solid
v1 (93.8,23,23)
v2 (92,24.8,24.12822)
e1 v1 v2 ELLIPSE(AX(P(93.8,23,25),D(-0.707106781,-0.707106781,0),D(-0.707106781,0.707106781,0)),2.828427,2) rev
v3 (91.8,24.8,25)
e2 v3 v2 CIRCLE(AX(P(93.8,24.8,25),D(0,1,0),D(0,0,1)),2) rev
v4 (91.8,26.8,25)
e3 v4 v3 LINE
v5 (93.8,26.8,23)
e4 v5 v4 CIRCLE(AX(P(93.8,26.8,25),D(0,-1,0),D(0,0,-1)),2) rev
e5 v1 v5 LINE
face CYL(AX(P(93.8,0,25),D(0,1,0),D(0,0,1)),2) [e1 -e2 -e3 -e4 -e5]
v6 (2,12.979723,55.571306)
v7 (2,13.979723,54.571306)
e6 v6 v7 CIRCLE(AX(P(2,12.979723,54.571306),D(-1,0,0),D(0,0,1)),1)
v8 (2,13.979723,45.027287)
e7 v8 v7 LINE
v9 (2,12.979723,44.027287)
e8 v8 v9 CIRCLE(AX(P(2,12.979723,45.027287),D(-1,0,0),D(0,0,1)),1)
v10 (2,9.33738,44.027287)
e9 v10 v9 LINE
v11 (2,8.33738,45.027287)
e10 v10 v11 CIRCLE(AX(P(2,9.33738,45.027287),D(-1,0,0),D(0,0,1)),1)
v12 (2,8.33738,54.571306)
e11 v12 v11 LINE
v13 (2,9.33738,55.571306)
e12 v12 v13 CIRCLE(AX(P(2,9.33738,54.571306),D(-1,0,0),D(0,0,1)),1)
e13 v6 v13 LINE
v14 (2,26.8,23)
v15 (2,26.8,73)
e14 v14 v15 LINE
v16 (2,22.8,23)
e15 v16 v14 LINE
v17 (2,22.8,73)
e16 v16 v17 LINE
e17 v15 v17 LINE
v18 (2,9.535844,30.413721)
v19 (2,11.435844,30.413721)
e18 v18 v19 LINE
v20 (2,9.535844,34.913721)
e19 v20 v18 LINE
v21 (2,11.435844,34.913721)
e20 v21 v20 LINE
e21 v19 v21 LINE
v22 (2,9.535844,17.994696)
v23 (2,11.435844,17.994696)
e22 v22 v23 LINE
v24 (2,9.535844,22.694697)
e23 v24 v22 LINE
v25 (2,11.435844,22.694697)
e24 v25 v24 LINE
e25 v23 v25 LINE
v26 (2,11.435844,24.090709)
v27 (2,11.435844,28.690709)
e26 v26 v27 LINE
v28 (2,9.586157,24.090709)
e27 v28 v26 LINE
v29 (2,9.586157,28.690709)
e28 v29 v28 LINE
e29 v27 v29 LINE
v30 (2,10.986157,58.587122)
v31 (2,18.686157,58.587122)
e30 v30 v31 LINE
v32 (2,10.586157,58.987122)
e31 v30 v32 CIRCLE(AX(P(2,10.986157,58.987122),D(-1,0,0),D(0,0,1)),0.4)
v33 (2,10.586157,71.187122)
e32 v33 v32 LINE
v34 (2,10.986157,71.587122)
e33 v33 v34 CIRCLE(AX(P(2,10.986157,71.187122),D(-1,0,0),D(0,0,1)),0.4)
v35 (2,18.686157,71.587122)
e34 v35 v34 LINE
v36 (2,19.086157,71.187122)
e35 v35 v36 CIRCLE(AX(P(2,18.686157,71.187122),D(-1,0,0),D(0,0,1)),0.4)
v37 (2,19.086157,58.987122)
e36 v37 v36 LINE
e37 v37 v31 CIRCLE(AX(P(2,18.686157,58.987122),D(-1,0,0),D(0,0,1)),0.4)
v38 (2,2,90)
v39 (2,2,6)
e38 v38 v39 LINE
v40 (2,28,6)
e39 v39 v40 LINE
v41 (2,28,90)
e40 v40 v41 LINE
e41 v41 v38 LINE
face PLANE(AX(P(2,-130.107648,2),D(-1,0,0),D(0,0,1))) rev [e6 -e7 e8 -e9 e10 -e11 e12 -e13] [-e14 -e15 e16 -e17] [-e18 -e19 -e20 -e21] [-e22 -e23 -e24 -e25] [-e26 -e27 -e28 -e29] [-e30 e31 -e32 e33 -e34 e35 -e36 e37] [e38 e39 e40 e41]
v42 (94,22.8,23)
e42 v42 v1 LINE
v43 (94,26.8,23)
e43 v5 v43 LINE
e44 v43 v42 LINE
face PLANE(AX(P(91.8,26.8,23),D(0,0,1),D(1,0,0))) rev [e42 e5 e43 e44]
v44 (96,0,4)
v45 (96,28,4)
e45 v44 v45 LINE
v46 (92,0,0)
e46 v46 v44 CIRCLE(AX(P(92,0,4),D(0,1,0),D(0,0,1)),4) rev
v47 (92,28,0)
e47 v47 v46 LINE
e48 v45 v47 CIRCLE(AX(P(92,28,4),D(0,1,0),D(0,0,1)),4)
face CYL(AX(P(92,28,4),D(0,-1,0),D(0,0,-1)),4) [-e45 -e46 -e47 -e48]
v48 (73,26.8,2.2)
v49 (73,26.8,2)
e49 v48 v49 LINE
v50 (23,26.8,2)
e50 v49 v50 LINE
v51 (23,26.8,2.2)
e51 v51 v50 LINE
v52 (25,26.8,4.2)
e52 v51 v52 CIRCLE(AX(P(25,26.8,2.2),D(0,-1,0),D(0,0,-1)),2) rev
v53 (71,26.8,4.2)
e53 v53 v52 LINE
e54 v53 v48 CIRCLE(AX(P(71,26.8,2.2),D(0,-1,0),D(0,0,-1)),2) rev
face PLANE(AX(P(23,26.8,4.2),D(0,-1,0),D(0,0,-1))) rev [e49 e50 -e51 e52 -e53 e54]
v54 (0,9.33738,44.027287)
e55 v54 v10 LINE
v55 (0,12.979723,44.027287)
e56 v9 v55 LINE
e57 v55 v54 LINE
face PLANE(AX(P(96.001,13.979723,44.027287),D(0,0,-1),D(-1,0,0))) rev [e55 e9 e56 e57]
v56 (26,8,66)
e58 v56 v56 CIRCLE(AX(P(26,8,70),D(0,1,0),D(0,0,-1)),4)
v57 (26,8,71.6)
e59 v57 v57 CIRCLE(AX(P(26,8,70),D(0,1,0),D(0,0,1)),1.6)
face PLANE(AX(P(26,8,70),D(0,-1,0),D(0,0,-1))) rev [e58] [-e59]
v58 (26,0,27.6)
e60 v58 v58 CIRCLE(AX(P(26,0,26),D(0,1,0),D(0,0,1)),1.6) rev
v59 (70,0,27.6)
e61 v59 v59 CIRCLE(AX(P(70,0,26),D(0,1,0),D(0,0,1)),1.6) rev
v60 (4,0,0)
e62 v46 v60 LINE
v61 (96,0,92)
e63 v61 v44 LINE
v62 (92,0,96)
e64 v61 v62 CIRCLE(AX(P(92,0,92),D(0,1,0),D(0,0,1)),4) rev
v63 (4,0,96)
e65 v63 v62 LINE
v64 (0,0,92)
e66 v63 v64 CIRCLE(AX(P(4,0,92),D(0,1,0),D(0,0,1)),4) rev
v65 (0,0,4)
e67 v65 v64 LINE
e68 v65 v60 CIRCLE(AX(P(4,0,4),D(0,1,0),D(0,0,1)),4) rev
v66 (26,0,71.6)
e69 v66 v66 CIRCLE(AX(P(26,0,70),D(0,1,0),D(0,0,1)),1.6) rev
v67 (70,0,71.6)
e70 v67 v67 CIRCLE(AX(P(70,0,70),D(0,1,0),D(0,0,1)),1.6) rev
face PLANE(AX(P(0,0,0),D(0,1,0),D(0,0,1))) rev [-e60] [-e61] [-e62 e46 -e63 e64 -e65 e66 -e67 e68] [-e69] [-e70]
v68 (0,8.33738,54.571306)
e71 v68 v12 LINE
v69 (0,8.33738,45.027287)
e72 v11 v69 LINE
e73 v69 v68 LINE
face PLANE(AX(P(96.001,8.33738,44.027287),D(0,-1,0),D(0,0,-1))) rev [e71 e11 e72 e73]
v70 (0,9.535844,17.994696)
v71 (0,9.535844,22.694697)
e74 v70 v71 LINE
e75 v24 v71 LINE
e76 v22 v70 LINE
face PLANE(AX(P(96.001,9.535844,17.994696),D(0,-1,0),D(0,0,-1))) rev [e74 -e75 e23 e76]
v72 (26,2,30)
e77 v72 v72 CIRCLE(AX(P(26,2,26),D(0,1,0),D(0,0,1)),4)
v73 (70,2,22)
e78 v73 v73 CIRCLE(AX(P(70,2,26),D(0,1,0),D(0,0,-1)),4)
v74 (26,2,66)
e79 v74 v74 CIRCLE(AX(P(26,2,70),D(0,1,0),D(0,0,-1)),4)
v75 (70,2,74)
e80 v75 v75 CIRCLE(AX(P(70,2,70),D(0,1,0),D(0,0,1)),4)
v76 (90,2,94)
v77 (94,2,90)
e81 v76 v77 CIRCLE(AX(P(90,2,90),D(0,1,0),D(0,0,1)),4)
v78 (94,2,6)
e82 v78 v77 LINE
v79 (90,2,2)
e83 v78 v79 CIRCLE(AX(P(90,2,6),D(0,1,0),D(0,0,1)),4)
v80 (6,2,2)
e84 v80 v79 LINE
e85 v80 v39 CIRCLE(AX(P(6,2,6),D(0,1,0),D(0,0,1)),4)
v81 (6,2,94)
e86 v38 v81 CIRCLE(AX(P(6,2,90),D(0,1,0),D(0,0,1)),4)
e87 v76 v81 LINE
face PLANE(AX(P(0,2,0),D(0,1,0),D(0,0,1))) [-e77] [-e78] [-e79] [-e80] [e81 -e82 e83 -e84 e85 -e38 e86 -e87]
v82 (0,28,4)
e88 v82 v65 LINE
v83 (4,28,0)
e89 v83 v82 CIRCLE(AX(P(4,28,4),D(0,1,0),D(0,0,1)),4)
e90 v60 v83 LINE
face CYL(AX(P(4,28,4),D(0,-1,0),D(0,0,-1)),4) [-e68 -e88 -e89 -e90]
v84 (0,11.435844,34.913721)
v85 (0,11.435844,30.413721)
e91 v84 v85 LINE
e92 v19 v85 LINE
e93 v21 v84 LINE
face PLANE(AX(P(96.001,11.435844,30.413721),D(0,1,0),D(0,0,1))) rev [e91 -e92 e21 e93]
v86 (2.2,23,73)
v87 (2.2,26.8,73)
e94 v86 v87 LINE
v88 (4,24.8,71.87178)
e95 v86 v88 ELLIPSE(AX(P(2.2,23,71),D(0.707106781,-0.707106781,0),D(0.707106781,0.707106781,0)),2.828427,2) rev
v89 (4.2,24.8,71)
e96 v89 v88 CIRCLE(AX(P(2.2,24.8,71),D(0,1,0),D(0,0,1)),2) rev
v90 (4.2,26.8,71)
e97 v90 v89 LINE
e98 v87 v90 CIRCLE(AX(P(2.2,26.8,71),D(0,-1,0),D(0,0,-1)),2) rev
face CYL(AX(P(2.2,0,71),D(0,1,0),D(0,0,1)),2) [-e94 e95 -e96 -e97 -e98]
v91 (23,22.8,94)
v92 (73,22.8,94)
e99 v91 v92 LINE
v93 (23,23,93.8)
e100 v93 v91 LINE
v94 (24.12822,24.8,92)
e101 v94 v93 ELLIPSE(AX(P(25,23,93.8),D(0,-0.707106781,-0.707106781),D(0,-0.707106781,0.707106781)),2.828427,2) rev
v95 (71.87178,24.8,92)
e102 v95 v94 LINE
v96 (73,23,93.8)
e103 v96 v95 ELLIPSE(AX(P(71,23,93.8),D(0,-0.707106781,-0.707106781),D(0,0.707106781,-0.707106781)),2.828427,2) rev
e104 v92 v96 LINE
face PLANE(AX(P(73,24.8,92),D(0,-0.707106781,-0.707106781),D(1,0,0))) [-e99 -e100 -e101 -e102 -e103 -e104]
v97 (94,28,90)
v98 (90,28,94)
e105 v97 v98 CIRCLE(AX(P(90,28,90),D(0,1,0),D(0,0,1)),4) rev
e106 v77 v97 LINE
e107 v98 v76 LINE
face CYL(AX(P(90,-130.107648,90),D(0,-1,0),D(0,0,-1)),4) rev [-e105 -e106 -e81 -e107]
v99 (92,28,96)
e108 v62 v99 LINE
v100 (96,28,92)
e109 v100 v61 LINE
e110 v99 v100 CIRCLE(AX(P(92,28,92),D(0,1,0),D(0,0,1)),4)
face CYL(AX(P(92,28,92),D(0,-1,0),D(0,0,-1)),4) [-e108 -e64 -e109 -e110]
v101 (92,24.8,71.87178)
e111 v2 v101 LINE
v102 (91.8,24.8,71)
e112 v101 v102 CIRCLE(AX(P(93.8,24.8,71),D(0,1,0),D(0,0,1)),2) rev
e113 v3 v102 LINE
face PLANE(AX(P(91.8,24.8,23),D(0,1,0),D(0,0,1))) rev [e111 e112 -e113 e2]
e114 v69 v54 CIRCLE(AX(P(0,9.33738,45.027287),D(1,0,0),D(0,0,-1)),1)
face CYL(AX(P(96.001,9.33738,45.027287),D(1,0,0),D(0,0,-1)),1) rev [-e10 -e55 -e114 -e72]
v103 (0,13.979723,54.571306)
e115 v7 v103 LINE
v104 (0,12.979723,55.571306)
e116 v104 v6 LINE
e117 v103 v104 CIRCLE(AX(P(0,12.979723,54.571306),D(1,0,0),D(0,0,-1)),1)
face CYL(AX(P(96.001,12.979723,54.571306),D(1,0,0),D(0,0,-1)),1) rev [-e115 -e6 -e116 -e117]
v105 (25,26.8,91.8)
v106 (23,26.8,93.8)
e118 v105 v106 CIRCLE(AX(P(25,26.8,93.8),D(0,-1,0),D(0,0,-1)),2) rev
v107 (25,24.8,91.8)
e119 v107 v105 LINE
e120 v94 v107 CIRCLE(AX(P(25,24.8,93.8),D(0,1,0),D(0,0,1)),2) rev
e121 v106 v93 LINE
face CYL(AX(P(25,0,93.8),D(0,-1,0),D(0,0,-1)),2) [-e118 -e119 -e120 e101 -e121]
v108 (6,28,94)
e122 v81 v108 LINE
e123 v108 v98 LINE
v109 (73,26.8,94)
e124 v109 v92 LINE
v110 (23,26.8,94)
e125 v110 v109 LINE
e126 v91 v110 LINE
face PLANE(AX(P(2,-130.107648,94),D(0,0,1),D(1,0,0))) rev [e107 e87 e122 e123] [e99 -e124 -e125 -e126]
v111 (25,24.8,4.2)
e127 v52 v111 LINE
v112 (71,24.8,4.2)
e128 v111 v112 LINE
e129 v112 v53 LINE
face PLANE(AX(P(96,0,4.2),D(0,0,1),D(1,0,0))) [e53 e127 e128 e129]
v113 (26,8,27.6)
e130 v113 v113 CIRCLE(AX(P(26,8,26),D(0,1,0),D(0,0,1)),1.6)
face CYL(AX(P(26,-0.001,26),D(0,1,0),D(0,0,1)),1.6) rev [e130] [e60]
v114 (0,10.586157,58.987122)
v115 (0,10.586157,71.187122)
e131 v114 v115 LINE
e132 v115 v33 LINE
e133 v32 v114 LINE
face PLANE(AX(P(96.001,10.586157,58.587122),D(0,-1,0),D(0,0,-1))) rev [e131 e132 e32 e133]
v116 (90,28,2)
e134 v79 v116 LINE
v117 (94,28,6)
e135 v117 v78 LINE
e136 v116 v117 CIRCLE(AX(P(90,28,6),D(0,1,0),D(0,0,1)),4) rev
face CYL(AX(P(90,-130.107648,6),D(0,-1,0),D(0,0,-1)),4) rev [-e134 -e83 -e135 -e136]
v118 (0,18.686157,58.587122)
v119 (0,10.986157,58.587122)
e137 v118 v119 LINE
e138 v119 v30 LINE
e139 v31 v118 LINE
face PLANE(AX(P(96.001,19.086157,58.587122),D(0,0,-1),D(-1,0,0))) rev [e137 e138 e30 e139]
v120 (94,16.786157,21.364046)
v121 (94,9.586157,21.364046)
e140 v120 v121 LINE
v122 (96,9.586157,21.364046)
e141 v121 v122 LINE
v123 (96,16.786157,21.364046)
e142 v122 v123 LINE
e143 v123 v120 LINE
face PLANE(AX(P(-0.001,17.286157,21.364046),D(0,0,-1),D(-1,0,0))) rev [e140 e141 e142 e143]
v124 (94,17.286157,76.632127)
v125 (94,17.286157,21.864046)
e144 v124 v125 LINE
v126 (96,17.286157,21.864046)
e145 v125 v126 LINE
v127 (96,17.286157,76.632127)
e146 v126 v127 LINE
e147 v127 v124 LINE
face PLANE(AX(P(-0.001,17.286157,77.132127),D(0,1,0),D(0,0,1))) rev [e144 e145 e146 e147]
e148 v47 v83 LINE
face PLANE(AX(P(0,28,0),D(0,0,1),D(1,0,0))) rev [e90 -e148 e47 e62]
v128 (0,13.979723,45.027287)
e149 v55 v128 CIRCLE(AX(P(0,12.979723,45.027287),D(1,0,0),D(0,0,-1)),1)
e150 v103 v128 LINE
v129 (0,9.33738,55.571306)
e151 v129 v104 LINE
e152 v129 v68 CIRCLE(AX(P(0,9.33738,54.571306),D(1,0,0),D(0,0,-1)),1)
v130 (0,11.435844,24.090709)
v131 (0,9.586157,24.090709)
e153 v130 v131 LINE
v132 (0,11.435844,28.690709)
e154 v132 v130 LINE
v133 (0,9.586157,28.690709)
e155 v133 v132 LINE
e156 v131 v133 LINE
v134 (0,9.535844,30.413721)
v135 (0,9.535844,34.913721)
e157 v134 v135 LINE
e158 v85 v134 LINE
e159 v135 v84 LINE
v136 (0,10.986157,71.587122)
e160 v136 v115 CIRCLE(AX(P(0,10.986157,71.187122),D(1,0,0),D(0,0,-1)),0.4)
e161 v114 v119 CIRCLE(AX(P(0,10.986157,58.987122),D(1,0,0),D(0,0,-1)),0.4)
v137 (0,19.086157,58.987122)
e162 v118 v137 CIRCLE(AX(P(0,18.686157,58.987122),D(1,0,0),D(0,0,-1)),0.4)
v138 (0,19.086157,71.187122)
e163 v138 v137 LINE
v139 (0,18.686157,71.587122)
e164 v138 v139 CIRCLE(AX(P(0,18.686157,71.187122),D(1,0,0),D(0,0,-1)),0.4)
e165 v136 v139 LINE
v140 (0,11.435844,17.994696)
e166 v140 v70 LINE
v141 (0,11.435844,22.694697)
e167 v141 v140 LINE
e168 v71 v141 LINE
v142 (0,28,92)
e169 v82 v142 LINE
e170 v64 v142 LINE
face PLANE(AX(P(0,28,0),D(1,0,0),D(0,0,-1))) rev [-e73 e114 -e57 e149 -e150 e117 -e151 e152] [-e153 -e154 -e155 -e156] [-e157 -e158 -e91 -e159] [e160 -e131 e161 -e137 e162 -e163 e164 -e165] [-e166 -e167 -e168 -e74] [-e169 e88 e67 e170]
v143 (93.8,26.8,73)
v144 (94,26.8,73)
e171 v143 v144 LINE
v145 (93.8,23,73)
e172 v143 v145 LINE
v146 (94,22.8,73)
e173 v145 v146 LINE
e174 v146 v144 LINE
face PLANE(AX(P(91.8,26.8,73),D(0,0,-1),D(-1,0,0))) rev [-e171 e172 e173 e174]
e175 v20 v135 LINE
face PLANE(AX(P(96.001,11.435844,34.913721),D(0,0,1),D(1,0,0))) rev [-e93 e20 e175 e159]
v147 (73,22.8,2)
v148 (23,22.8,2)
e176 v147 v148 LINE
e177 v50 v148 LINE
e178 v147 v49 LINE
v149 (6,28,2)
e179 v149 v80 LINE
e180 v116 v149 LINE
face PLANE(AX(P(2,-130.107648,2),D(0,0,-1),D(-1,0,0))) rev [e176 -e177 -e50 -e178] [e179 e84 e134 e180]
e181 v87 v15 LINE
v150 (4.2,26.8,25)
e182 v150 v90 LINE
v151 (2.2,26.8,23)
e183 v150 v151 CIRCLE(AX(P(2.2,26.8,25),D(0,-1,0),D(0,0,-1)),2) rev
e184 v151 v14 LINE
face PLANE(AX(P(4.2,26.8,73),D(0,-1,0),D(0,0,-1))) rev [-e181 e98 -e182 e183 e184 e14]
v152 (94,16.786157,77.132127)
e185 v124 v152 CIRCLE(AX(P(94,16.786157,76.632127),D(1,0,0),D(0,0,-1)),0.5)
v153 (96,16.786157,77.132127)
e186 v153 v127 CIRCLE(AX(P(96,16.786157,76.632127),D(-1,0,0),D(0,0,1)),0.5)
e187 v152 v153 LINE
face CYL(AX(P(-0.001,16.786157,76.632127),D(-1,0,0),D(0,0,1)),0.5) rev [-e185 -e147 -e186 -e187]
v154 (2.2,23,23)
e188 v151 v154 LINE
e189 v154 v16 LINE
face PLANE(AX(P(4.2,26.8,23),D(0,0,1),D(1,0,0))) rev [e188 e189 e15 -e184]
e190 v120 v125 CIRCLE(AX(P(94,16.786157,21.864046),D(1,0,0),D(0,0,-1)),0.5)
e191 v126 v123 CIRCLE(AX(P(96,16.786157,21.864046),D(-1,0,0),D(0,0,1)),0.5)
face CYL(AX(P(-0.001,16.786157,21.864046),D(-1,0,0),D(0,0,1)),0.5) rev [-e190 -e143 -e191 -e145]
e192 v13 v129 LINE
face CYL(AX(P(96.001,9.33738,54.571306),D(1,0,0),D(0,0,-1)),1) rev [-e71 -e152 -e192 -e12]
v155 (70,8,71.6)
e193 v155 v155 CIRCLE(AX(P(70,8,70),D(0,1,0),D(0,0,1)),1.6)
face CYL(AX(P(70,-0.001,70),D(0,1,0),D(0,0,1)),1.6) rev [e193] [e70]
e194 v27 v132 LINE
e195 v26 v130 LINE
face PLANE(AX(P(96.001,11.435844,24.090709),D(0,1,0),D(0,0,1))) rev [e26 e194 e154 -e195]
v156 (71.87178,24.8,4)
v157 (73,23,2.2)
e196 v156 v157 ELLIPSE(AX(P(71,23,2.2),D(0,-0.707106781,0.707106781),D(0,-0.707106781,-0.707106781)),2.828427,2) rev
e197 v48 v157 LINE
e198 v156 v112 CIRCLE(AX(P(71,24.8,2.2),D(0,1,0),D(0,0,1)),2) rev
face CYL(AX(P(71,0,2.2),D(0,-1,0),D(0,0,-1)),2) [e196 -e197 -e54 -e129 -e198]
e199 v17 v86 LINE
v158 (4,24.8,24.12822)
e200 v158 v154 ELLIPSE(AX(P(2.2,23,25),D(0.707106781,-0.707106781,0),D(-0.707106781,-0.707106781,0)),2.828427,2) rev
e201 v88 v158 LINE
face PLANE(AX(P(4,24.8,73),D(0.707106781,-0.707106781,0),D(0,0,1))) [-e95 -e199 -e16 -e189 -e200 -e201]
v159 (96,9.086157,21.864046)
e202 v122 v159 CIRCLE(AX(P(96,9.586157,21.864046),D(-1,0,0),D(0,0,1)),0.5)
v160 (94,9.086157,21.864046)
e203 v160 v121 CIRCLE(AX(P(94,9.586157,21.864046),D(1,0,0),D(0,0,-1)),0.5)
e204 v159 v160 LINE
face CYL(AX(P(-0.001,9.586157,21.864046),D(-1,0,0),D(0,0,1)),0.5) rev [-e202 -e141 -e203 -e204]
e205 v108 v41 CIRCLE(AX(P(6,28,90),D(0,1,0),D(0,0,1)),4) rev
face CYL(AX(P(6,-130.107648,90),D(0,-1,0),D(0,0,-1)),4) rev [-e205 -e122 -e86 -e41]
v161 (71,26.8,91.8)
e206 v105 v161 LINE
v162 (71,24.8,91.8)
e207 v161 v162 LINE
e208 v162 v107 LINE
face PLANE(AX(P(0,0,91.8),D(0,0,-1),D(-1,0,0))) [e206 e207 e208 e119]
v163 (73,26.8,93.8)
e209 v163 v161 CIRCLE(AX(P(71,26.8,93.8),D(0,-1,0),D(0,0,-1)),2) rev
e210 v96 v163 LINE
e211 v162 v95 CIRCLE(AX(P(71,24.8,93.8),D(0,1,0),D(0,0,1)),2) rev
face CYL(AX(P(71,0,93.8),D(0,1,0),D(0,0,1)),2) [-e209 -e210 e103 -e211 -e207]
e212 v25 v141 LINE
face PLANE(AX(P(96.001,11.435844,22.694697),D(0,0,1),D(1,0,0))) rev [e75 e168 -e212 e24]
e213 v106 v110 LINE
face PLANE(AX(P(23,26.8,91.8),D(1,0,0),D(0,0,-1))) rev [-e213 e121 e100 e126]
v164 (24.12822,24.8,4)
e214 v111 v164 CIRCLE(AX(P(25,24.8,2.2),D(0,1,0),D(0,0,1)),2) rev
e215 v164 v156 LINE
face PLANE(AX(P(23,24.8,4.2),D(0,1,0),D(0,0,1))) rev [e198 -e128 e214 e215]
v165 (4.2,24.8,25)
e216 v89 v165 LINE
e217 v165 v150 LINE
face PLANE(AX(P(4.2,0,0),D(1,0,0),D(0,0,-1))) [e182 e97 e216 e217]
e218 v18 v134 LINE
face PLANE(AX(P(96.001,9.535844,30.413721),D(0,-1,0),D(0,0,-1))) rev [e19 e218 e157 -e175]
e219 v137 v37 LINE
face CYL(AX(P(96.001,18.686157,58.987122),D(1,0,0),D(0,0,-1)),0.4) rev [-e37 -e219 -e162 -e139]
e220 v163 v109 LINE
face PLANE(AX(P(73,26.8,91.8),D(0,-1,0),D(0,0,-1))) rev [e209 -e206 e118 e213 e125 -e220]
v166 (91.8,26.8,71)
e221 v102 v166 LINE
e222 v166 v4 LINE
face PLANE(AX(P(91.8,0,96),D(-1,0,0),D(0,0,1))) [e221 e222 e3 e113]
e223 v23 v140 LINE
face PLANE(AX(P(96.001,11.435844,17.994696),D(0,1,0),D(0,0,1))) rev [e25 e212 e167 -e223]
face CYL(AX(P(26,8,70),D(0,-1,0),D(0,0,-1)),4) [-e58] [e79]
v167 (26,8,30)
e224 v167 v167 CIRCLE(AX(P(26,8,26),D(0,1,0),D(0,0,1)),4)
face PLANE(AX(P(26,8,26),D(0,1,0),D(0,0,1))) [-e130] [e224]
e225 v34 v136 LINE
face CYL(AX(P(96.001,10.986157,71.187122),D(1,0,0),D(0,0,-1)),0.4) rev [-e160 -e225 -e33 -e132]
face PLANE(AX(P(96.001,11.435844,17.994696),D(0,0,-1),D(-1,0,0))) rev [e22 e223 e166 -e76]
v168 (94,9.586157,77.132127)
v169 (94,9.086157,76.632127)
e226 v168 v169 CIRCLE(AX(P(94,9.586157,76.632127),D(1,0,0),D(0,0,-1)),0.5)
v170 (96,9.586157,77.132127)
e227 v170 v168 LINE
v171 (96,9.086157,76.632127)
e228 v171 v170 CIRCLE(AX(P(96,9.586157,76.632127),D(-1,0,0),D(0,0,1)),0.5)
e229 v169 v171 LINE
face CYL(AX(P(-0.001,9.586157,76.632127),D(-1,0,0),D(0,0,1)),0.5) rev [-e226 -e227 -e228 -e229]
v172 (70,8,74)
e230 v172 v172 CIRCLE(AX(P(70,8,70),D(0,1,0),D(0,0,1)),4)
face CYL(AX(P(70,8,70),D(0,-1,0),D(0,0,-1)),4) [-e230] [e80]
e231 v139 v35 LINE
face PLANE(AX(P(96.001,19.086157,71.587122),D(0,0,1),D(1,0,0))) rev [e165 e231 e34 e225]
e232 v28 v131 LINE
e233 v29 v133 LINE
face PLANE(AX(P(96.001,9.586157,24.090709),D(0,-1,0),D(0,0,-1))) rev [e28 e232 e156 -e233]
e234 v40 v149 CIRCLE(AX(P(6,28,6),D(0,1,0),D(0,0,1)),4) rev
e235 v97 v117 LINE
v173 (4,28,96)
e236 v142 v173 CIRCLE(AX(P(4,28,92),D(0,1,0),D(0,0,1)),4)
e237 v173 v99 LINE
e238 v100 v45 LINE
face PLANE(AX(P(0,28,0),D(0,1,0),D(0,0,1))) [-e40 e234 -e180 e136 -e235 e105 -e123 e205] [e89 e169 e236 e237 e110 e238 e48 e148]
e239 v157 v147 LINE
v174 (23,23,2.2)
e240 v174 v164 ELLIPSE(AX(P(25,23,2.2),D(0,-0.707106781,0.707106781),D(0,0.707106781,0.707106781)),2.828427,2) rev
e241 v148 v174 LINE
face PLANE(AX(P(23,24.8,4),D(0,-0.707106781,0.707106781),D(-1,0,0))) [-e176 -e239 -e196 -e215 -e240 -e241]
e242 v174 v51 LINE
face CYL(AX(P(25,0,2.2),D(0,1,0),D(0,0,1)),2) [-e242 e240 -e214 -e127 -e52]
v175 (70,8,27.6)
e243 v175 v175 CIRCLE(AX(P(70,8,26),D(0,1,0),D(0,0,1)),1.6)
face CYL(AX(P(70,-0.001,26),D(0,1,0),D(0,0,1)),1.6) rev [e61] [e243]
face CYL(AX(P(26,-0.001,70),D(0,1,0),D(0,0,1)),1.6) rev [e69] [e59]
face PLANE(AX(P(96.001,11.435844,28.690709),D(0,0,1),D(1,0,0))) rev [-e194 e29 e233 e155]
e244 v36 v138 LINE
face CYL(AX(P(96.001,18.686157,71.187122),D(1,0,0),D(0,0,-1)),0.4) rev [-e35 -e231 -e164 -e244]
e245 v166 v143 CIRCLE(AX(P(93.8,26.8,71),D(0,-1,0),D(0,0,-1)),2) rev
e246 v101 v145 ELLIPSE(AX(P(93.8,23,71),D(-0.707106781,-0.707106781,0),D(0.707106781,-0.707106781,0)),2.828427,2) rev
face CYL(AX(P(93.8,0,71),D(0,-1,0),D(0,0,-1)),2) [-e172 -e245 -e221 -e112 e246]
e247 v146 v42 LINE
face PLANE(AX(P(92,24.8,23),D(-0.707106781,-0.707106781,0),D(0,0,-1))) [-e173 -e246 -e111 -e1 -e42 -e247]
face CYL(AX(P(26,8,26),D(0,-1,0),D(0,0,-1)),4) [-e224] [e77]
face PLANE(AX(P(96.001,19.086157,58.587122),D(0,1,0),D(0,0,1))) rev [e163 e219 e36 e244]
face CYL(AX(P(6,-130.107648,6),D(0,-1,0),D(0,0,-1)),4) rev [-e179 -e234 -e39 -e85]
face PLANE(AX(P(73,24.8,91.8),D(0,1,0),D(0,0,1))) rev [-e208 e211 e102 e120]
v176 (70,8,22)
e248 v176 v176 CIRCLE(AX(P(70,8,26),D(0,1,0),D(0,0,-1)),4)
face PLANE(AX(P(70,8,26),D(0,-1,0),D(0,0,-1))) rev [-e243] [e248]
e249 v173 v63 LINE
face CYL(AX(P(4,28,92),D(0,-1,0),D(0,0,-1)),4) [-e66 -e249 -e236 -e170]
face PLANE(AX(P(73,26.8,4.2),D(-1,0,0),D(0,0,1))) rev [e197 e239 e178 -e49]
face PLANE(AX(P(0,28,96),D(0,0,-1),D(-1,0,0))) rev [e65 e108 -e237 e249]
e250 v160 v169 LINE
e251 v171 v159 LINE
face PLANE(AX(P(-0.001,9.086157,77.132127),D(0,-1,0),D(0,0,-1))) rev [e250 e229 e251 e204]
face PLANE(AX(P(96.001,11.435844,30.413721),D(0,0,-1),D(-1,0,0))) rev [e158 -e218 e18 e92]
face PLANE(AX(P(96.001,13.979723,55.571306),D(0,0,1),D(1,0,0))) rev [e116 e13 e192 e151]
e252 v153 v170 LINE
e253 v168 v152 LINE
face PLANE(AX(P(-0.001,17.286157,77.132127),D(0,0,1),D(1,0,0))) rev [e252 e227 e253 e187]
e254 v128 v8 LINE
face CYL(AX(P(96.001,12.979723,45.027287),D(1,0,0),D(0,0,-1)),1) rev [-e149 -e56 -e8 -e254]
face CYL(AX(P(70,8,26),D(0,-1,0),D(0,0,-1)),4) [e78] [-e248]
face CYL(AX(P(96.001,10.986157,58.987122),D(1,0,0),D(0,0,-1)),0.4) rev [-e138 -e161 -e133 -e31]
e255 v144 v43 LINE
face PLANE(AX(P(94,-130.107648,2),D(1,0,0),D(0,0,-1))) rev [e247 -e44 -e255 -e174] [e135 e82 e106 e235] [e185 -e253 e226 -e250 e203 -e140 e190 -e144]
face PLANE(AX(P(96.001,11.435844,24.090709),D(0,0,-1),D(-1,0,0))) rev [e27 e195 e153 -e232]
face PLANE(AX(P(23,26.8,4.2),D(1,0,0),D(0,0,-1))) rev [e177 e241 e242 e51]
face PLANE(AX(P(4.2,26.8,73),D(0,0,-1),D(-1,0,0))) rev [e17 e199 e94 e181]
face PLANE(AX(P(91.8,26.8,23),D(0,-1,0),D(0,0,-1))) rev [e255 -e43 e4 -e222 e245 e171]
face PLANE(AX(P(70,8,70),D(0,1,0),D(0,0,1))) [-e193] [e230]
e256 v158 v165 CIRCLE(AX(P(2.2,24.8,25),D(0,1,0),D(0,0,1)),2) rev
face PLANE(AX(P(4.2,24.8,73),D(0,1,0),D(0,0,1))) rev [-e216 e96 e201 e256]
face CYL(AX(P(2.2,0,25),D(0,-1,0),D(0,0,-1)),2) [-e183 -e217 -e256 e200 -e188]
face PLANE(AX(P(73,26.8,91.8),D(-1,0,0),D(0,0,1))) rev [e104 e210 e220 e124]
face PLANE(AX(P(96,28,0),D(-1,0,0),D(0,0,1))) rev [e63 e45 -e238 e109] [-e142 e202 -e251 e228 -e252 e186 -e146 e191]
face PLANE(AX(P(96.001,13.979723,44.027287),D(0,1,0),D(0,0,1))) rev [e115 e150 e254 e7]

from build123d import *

# Parameters (mm, degrees)
SKETCH_1_W               = 96
SKETCH_1_H               = 96
EXTRUDE_1_DEPTH          = 28
SKETCH_3_W               = 92
SKETCH_3_H               = 92
CUT_EXTRUDE_1_DEPTH      = 26
FILLET_1_R               = 4
FILLET_2_R               = 4
SKETCH_4_R               = 4
EXTRUDE_2_DEPTH          = 6
SKETCH_5_R               = 1.6
CUT_EXTRUDE_2_DEPTH      = 8
SKETCH_6_W               = 12.999999928
SKETCH_6_H               = 8.49999995
SKETCH_6_W_2             = 4.700000191
SKETCH_6_H_2             = 1.900000077
SKETCH_6_W_3             = 4.600000187
SKETCH_6_H_3             = 1.849687021
SKETCH_6_W_4             = 4.500000183
SKETCH_6_W_5             = 11.544018717
SKETCH_6_H_4             = 5.642342208
CUT_EXTRUDE_3_DEPTH      = 2
FILLET_3_R               = 0.4
SKETCH_7_W               = 55.768080965
SKETCH_7_H               = 8.199999866
CUT_EXTRUDE_4_DEPTH      = 2
FILLET_4_R               = 0.5
FILLET_5_R               = 1
SKETCH_8_W               = 50
SKETCH_8_H               = 2
EXTRUDE_3_DEPTH          = 2.2
FILLET_6_R               = 2
PATTERN_CIRCULAR_1_COUNT = 4
FILLET_7_R               = 2
CHAMFER_START            = 23
CHAMFER_1_DEPTH          = 50
CHAMFER_START_2          = 22.8
CHAMFER_1_2_DEPTH        = 2
CHAMFER_2_DEPTH          = 50
CHAMFER_2_2_DEPTH        = 2
CHAMFER_3_DEPTH          = 50
CHAMFER_3_2_DEPTH        = 2
CHAMFER_4_DEPTH          = 50
CHAMFER_4_2_DEPTH        = 2


with BuildPart() as part:
    # 草图1 → 凸台-拉伸1 (new body)
    with BuildSketch(Plane(origin=(0, 0, 0), x_dir=(1, 0, 0), z_dir=(0, 1, 0))):
        with Locations((48, -48)):
            Rectangle(SKETCH_1_W, SKETCH_1_H)
    extrude(amount=EXTRUDE_1_DEPTH)

    # 草图3 → 切除-拉伸1 (cut)
    with BuildSketch(Plane(origin=(0, 28, 0), x_dir=(1, 0, 0), z_dir=(0, 1, 0))):
        with Locations((48, -48)):
            Rectangle(SKETCH_3_W, SKETCH_3_H)
    extrude(amount=-CUT_EXTRUDE_1_DEPTH, mode=Mode.SUBTRACT)

    # 圆角1
    fillet_1_edges = [part.edges().sort_by_distance(p)[0] for p in [
        (2, 15, 94),
        (2, 15, 2),
        (94, 15, 2),
        (94, 15, 94),
    ]]
    fillet(fillet_1_edges, radius=FILLET_1_R)

    # 圆角2
    fillet_2_edges = [part.edges().sort_by_distance(p)[0] for p in [
        (0, 14, 0),
        (96, 14, 0),
        (96, 14, 96),
        (0, 14, 96),
    ]]
    fillet(fillet_2_edges, radius=FILLET_2_R)

    # 草图4 → 凸台-拉伸2 (add)
    with BuildSketch(Plane(origin=(0, 2, 0), x_dir=(1, 0, 0), z_dir=(0, 1, 0))):
        with Locations(Location((26, -26, 0), (0, 0, 270))):
            Circle(SKETCH_4_R)
        with Locations(Location((70, -26, 0), (0, 0, 90))):
            Circle(SKETCH_4_R)
        with Locations(Location((70, -70, 0), (0, 0, 270))):
            Circle(SKETCH_4_R)
        with Locations(Location((26, -70, 0), (0, 0, 90))):
            Circle(SKETCH_4_R)
    extrude(amount=EXTRUDE_2_DEPTH)

    # 草图5 → 切除-拉伸2 (cut)
    with BuildSketch(Plane(origin=(0, 8, 0), x_dir=(1, 0, 0), z_dir=(0, 1, 0))):
        with Locations(Location((26, -26, 0), (0, 0, 270))):
            Circle(SKETCH_5_R)
        with Locations(Location((70, -26, 0), (0, 0, 270))):
            Circle(SKETCH_5_R)
        with Locations(Location((26, -70, 0), (0, 0, 270))):
            Circle(SKETCH_5_R)
        with Locations(Location((70, -70, 0), (0, 0, 270))):
            Circle(SKETCH_5_R)
    extrude(amount=-CUT_EXTRUDE_2_DEPTH, mode=Mode.SUBTRACT)

    # 草图6 → 切除-拉伸3 (cut)
    with BuildSketch(Plane.ZY):
        with Locations((65.087122174, 14.836156947)):
            Rectangle(SKETCH_6_W, SKETCH_6_H)
        with Locations((20.344696565, 10.485844036)):
            Rectangle(SKETCH_6_W_2, SKETCH_6_H_2)
        with Locations((26.390708755, 10.511000564)):
            Rectangle(SKETCH_6_W_3, SKETCH_6_H_3)
        with Locations((32.663721202, 10.485844036)):
            Rectangle(SKETCH_6_W_4, SKETCH_6_H_2)
        with Locations((49.799296419, 11.158551524)):
            Rectangle(SKETCH_6_W_5, SKETCH_6_H_4)
    extrude(amount=-CUT_EXTRUDE_3_DEPTH, mode=Mode.SUBTRACT)

    # 圆角3
    fillet_3_edges = [part.edges().sort_by_distance(p)[0] for p in [
        (1, 10.586156972, 58.58712221),
        (1, 19.086156922, 58.58712221),
        (1, 19.086156922, 71.587122138),
        (1, 10.586156972, 71.587122138),
    ]]
    fillet(fillet_3_edges, radius=FILLET_3_R)

    # 草图7 → 切除-拉伸4 (cut)
    with BuildSketch(Plane(origin=(96, 0, 0), x_dir=(0, 0, -1), z_dir=(1, 0, 0))):
        with Locations((-49.248086711, 13.186156826)):
            Rectangle(SKETCH_7_W, SKETCH_7_H)
    extrude(amount=-CUT_EXTRUDE_4_DEPTH, mode=Mode.SUBTRACT)

    # 圆角4
    fillet_4_edges = [part.edges().sort_by_distance(p)[0] for p in [
        (95, 9.086156893, 77.132127193),
        (95, 17.286156759, 77.132127193),
        (95, 17.286156759, 21.364046228),
        (95, 9.086156893, 21.364046228),
    ]]
    fillet(fillet_4_edges, radius=FILLET_4_R)

    # 圆角5
    fillet_5_edges = [part.edges().sort_by_distance(p)[0] for p in [
        (1, 8.33738042, 44.02728706),
        (1, 13.979722628, 44.02728706),
        (1, 13.979722628, 55.571305777),
        (1, 8.33738042, 55.571305777),
    ]]
    fillet(fillet_5_edges, radius=FILLET_5_R)

    # 草图8 → 凸台-拉伸3 (add)
    with BuildSketch(Plane(origin=(0, 0, 94), x_dir=(-1, 0, 0), z_dir=(0, 0, -1))):
        with Locations((-48, 25.8)):
            Rectangle(SKETCH_8_W, SKETCH_8_H)
    extrude_3 = extrude(amount=EXTRUDE_3_DEPTH)

    # 圆角6
    fillet_6_edges = [part.edges().sort_by_distance(p)[0] for p in [
        (73, 25.8, 91.8),
        (23, 25.8, 91.8),
    ]]
    fillet(fillet_6_edges, radius=FILLET_6_R)

    # 阵列(圆周)1: 凸台-拉伸3 ×4 about axis
    pattern_circular_1_axis = Axis((48, 0, 48), (0, 1, 0))
    for i in range(1, PATTERN_CIRCULAR_1_COUNT):
        add(extrude_3.rotate(pattern_circular_1_axis, i * 360 / PATTERN_CIRCULAR_1_COUNT))

    # 圆角7
    fillet_7_edges = [part.edges().sort_by_distance(p)[0] for p in [
        (91.8, 25.8, 23),
        (91.8, 25.8, 73),
        (23, 25.8, 4.2),
        (73, 25.8, 4.2),
        (4.2, 25.8, 73),
        (4.2, 25.8, 23),
    ]]
    fillet(fillet_7_edges, radius=FILLET_7_R)

    # 倒角1: read off the stored shape, not the designer's step
    # 倒角1 outline → 倒角1 (add)
    with BuildSketch(Plane.YZ.offset(CHAMFER_START)):
        Polygon((24.8, 2), (24.8, 4), (22.8, 2), align=None)
    extrude(amount=CHAMFER_1_DEPTH)

    # Chamfer 1 2 outline → Chamfer 1 2 (cut)
    with BuildSketch(Plane(origin=(0, 0, 0), x_dir=(1, 0, 0), z_dir=(0, 1, 0)).offset(CHAMFER_START_2)):
        with BuildLine():
            Line((73, -4.20000003), (73, -2.2))
            ThreePointArc((73, -2.2), (72.414213562, -3.614213562), (71, -4.2))
            Line((71, -4.2), (73, -4.20000003))
        make_face()
        with BuildLine():
            Line((23, -4.20000003), (25, -4.2))
            ThreePointArc((25, -4.2), (23.585786438, -3.614213562), (23, -2.2))
            Line((23, -2.2), (23, -4.20000003))
        make_face()
    extrude(amount=CHAMFER_1_2_DEPTH, mode=Mode.SUBTRACT)

    # 倒角2: read off the stored shape, not the designer's step
    # 倒角2 outline → 倒角2 (add)
    with BuildSketch(Plane.YZ.offset(CHAMFER_START)):
        Polygon((24.8, 94), (22.8, 94), (24.8, 92), align=None)
    extrude(amount=CHAMFER_2_DEPTH)

    # Chamfer 2 2 outline → Chamfer 2 2 (cut)
    with BuildSketch(Plane(origin=(0, 0, 0), x_dir=(1, 0, 0), z_dir=(0, 1, 0)).offset(CHAMFER_START_2)):
        with BuildLine():
            Line((23, -91.79999997), (23, -93.8))
            ThreePointArc((23, -93.8), (23.585786438, -92.385786438), (25, -91.8))
            Line((25, -91.8), (23, -91.79999997))
        make_face()
        with BuildLine():
            Line((73, -91.79999997), (71, -91.8))
            ThreePointArc((71, -91.8), (72.414213562, -92.385786438), (73, -93.8))
            Line((73, -93.8), (73, -91.79999997))
        make_face()
    extrude(amount=CHAMFER_2_2_DEPTH, mode=Mode.SUBTRACT)

    # 倒角3: read off the stored shape, not the designer's step
    # 倒角3 outline → 倒角3 (add)
    with BuildSketch(Plane.XY.offset(CHAMFER_START)):
        Polygon((94, 24.8), (92, 24.8), (94, 22.8), align=None)
    extrude(amount=CHAMFER_3_DEPTH)

    # Chamfer 3 2 outline → Chamfer 3 2 (cut)
    with BuildSketch(Plane(origin=(0, 0, 0), x_dir=(1, 0, 0), z_dir=(0, 1, 0)).offset(CHAMFER_START_2)):
        with BuildLine():
            Line((91.79999997, -73), (93.8, -73))
            ThreePointArc((93.8, -73), (92.385786438, -72.414213562), (91.8, -71))
            Line((91.8, -71), (91.79999997, -73))
        make_face()
        with BuildLine():
            Line((91.79999997, -23), (91.8, -25))
            ThreePointArc((91.8, -25), (92.385786438, -23.585786438), (93.8, -23))
            Line((93.8, -23), (91.79999997, -23))
        make_face()
    extrude(amount=CHAMFER_3_2_DEPTH, mode=Mode.SUBTRACT)

    # 倒角4: read off the stored shape, not the designer's step
    # 倒角4 outline → 倒角4 (add)
    with BuildSketch(Plane.XY.offset(CHAMFER_START)):
        Polygon((2, 24.8), (2, 22.8), (4, 24.8), align=None)
    extrude(amount=CHAMFER_4_DEPTH)

    # Chamfer 4 2 outline → Chamfer 4 2 (cut)
    with BuildSketch(Plane(origin=(0, 0, 0), x_dir=(1, 0, 0), z_dir=(0, 1, 0)).offset(CHAMFER_START_2)):
        with BuildLine():
            Line((4.20000003, -23), (2.2, -23))
            ThreePointArc((2.2, -23), (3.614213562, -23.585786438), (4.2, -25))
            Line((4.2, -25), (4.20000003, -23))
        make_face()
        with BuildLine():
            Line((4.200000031, -73), (4.2, -71))
            ThreePointArc((4.2, -71), (3.614213562, -72.414213562), (2.2, -73))
            Line((2.2, -73), (4.200000031, -73))
        make_face()
    extrude(amount=CHAMFER_4_2_DEPTH, mode=Mode.SUBTRACT)


solid = part.part
